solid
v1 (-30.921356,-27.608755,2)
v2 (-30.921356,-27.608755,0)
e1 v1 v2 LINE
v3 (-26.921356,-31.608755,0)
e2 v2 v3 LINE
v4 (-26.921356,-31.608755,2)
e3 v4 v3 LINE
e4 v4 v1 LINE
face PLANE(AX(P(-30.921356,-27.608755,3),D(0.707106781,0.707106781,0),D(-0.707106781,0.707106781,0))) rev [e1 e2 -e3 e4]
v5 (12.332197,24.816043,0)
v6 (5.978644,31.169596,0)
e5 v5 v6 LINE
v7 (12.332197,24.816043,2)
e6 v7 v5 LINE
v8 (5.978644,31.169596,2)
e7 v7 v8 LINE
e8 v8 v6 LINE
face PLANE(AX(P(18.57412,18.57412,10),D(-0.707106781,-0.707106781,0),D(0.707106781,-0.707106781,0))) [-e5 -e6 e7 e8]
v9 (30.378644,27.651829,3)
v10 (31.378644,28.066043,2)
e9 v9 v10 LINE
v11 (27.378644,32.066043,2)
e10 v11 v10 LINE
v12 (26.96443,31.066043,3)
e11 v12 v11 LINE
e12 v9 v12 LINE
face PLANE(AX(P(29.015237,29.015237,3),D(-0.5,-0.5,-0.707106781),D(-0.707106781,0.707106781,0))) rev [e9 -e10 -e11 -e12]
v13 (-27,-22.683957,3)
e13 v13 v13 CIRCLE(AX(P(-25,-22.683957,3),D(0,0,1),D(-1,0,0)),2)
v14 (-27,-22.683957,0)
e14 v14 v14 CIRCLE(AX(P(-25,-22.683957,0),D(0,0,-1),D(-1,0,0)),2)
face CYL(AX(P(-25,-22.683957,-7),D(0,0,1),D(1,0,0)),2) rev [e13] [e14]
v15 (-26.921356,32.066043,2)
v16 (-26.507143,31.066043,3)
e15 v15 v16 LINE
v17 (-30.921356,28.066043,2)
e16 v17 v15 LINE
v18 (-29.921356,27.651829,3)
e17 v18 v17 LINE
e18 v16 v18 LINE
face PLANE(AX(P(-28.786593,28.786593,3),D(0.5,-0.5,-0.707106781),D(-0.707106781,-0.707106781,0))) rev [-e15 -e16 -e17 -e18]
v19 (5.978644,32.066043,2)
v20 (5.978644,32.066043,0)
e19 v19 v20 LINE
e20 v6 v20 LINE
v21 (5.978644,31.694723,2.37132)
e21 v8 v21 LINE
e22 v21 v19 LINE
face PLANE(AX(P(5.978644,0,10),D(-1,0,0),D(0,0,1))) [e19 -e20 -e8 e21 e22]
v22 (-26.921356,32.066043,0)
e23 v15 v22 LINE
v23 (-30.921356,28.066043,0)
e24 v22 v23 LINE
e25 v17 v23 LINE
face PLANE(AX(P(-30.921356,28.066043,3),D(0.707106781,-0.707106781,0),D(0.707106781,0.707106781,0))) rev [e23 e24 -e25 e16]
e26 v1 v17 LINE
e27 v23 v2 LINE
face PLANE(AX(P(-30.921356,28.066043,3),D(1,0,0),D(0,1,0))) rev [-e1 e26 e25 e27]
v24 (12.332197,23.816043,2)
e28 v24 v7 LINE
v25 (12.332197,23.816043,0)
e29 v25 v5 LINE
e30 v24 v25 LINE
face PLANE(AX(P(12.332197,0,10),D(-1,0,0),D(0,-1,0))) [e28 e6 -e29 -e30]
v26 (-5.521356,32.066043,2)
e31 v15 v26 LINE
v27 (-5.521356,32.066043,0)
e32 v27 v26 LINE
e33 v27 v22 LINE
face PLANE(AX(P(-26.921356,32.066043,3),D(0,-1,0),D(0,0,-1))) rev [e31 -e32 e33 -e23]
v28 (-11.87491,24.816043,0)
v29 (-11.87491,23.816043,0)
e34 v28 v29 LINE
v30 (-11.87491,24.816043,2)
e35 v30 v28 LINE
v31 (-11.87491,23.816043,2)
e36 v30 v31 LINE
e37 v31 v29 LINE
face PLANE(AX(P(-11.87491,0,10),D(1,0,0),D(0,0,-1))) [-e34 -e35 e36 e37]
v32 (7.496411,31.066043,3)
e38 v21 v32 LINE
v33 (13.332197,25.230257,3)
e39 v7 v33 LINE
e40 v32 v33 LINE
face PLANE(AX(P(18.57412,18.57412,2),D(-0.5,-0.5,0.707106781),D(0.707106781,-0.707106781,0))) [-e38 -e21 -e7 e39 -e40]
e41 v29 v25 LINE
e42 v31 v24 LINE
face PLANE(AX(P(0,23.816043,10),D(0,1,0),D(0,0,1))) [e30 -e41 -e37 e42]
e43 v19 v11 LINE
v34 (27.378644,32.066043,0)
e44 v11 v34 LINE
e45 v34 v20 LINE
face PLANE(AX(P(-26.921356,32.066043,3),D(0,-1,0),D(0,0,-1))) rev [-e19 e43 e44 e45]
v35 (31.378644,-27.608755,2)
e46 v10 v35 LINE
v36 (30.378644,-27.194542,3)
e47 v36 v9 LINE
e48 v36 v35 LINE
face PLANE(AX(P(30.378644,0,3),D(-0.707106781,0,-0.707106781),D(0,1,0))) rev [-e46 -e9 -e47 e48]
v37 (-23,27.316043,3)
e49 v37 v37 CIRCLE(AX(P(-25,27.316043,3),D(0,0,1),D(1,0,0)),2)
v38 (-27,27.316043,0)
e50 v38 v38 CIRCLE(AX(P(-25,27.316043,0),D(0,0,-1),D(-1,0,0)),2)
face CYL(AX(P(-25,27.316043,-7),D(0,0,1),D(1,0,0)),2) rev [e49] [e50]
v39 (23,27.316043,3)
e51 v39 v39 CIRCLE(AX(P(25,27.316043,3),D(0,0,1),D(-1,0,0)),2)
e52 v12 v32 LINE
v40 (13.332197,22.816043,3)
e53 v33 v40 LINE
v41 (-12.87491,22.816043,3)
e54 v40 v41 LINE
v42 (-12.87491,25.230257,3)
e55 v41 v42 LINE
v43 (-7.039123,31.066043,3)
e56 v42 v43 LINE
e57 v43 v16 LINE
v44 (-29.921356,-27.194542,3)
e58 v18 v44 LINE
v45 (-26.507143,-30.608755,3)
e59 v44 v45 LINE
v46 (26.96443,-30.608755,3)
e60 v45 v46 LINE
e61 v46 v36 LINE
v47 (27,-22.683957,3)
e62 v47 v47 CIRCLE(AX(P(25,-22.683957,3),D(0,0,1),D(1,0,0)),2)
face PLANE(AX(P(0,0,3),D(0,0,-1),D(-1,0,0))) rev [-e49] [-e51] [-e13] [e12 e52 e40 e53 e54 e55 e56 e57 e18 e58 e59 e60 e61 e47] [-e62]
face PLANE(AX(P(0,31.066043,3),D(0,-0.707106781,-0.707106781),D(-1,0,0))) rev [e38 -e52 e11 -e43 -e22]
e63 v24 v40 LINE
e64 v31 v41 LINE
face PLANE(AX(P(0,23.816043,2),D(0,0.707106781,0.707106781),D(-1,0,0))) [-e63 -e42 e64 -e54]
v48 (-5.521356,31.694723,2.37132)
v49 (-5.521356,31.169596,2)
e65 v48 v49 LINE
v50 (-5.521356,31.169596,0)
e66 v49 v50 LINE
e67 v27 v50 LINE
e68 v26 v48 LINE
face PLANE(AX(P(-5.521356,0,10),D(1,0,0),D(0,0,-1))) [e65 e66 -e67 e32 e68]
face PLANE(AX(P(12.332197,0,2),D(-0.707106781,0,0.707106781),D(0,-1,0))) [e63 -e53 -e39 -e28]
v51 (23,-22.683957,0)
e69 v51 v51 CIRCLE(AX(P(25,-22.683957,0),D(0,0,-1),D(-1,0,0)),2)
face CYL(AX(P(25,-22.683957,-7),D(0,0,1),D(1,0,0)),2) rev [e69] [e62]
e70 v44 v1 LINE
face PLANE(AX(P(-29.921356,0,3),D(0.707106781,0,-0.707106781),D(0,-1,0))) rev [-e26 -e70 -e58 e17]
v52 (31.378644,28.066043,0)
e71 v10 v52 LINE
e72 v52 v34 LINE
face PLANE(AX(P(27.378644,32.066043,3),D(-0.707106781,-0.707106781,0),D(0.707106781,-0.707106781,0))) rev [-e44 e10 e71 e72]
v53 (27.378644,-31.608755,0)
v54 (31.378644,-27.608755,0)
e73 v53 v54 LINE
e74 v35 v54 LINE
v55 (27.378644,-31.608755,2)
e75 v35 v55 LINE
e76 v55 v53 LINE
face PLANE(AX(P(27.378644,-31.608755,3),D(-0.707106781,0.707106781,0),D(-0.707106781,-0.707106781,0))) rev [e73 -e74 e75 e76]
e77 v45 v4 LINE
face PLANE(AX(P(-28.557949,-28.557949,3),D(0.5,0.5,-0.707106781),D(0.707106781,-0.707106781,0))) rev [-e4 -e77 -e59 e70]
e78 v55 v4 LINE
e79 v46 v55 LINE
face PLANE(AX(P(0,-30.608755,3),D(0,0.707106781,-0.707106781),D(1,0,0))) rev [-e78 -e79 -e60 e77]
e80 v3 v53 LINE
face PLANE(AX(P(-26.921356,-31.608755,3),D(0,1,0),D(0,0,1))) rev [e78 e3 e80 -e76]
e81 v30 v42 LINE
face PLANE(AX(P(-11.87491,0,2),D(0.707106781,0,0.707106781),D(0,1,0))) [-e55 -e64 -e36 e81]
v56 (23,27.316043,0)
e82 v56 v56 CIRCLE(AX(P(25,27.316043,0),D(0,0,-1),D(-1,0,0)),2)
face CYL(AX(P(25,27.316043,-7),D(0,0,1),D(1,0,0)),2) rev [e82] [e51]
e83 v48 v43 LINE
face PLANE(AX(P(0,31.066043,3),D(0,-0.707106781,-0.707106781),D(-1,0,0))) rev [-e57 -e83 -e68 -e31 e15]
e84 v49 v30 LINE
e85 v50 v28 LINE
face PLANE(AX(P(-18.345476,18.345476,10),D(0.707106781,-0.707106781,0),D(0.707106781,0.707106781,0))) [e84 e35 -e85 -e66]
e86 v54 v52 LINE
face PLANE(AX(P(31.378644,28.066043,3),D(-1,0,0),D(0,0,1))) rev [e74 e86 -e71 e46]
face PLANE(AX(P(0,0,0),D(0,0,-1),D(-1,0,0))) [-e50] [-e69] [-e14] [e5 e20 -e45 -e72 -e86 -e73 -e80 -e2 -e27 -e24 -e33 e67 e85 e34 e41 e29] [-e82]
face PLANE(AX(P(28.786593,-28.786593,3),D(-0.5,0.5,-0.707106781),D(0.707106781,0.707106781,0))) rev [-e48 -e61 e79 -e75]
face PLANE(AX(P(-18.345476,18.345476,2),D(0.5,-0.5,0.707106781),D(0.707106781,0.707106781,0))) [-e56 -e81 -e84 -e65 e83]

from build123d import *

# Parameters (mm, degrees)
BOSS_EXTRUDE1_DEPTH = 3
CUT_EXTRUDE4_DEPTH  = 10
CHAMFER1_SIZE       = 1
SKETCH4_R           = 2
CUT_EXTRUDE5_DEPTH  = 10


with BuildPart() as part:
    # Sketch3 → Boss-Extrude1 (new body)
    with BuildSketch(Plane.XY):
        Polygon((-26.921356186, 32.06604295), (27.378643814, 32.06604295), (31.378643814, 28.06604295), (31.378643814, -27.608755321), (27.378643814, -31.608755321), (-26.921356186, -31.608755321), (-30.921356186, -27.608755321), (-30.921356186, 28.06604295), align=None)
    extrude(amount=BOSS_EXTRUDE1_DEPTH)

    # Sketch2 → Cut-Extrude4 (cut)
    with BuildSketch(Plane.XY):
        Polygon((-11.874909576, 24.81604295), (-11.874909576, 23.81604295), (12.332197205, 23.81604295), (12.332197205, 24.81604295), (5.978643814, 31.16959634), (5.978643814, 32.31604295), (-5.521356186, 32.31604295), (-5.521356186, 31.16959634), align=None)
    extrude(amount=CUT_EXTRUDE4_DEPTH, mode=Mode.SUBTRACT)

    # Chamfer1
    chamfer1_edges = [part.edges().sort_by_distance(p)[0] for p in [
        (-16.221356186, 32.06604295, 3),
    ]]
    chamfer(chamfer1_edges, length=CHAMFER1_SIZE)
    chamfer1_2_edges = [part.edges().sort_by_distance(p)[0] for p in [
        (-29.421356186, 29.56604295, 3),
    ]]
    chamfer(chamfer1_2_edges, length=CHAMFER1_SIZE)
    chamfer1_3_edges = [part.edges().sort_by_distance(p)[0] for p in [
        (-30.921356186, -0.478462967, 3),
    ]]
    chamfer(chamfer1_3_edges, length=CHAMFER1_SIZE)
    chamfer1_4_edges = [part.edges().sort_by_distance(p)[0] for p in [
        (-28.421356186, -30.108755321, 3),
    ]]
    chamfer(chamfer1_4_edges, length=CHAMFER1_SIZE)
    chamfer1_5_edges = [part.edges().sort_by_distance(p)[0] for p in [
        (0.935750595, -31.608755321, 3),
    ]]
    chamfer(chamfer1_5_edges, length=CHAMFER1_SIZE)
    chamfer1_6_edges = [part.edges().sort_by_distance(p)[0] for p in [
        (29.878643814, -29.108755321, 3),
    ]]
    chamfer(chamfer1_6_edges, length=CHAMFER1_SIZE)
    chamfer1_7_edges = [part.edges().sort_by_distance(p)[0] for p in [
        (31.378643814, 0.935750595, 3),
    ]]
    chamfer(chamfer1_7_edges, length=CHAMFER1_SIZE)
    chamfer1_8_edges = [part.edges().sort_by_distance(p)[0] for p in [
        (28.878643814, 30.56604295, 3),
    ]]
    chamfer(chamfer1_8_edges, length=CHAMFER1_SIZE)
    chamfer1_9_edges = [part.edges().sort_by_distance(p)[0] for p in [
        (15.971537033, 32.06604295, 3),
    ]]
    chamfer(chamfer1_9_edges, length=CHAMFER1_SIZE)
    chamfer1_10_edges = [part.edges().sort_by_distance(p)[0] for p in [
        (9.207197205, 27.94104295, 3),
    ]]
    chamfer(chamfer1_10_edges, length=CHAMFER1_SIZE)
    chamfer1_11_edges = [part.edges().sort_by_distance(p)[0] for p in [
        (12.332197205, 24.31604295, 3),
    ]]
    chamfer(chamfer1_11_edges, length=CHAMFER1_SIZE)
    chamfer1_12_edges = [part.edges().sort_by_distance(p)[0] for p in [
        (0.228643814, 23.81604295, 3),
    ]]
    chamfer(chamfer1_12_edges, length=CHAMFER1_SIZE)
    chamfer1_13_edges = [part.edges().sort_by_distance(p)[0] for p in [
        (-11.874909576, 24.31604295, 3),
    ]]
    chamfer(chamfer1_13_edges, length=CHAMFER1_SIZE)
    chamfer1_14_edges = [part.edges().sort_by_distance(p)[0] for p in [
        (-8.749909576, 27.94104295, 3),
    ]]
    chamfer(chamfer1_14_edges, length=CHAMFER1_SIZE)

    # Sketch4 → Cut-Extrude5 (cut)
    with BuildSketch(Plane.XY.offset(3)):
        with Locations((-25, 27.31604295)):
            Circle(SKETCH4_R)
        with Locations(Location((25, 27.31604295, 0), (0, 0, 180))):
            Circle(SKETCH4_R)
        with Locations((25, -22.68395705)):
            Circle(SKETCH4_R)
        with Locations(Location((-25, -22.68395705, 0), (0, 0, 180))):
            Circle(SKETCH4_R)
    extrude(amount=-CUT_EXTRUDE5_DEPTH, mode=Mode.SUBTRACT)


solid = part.part
